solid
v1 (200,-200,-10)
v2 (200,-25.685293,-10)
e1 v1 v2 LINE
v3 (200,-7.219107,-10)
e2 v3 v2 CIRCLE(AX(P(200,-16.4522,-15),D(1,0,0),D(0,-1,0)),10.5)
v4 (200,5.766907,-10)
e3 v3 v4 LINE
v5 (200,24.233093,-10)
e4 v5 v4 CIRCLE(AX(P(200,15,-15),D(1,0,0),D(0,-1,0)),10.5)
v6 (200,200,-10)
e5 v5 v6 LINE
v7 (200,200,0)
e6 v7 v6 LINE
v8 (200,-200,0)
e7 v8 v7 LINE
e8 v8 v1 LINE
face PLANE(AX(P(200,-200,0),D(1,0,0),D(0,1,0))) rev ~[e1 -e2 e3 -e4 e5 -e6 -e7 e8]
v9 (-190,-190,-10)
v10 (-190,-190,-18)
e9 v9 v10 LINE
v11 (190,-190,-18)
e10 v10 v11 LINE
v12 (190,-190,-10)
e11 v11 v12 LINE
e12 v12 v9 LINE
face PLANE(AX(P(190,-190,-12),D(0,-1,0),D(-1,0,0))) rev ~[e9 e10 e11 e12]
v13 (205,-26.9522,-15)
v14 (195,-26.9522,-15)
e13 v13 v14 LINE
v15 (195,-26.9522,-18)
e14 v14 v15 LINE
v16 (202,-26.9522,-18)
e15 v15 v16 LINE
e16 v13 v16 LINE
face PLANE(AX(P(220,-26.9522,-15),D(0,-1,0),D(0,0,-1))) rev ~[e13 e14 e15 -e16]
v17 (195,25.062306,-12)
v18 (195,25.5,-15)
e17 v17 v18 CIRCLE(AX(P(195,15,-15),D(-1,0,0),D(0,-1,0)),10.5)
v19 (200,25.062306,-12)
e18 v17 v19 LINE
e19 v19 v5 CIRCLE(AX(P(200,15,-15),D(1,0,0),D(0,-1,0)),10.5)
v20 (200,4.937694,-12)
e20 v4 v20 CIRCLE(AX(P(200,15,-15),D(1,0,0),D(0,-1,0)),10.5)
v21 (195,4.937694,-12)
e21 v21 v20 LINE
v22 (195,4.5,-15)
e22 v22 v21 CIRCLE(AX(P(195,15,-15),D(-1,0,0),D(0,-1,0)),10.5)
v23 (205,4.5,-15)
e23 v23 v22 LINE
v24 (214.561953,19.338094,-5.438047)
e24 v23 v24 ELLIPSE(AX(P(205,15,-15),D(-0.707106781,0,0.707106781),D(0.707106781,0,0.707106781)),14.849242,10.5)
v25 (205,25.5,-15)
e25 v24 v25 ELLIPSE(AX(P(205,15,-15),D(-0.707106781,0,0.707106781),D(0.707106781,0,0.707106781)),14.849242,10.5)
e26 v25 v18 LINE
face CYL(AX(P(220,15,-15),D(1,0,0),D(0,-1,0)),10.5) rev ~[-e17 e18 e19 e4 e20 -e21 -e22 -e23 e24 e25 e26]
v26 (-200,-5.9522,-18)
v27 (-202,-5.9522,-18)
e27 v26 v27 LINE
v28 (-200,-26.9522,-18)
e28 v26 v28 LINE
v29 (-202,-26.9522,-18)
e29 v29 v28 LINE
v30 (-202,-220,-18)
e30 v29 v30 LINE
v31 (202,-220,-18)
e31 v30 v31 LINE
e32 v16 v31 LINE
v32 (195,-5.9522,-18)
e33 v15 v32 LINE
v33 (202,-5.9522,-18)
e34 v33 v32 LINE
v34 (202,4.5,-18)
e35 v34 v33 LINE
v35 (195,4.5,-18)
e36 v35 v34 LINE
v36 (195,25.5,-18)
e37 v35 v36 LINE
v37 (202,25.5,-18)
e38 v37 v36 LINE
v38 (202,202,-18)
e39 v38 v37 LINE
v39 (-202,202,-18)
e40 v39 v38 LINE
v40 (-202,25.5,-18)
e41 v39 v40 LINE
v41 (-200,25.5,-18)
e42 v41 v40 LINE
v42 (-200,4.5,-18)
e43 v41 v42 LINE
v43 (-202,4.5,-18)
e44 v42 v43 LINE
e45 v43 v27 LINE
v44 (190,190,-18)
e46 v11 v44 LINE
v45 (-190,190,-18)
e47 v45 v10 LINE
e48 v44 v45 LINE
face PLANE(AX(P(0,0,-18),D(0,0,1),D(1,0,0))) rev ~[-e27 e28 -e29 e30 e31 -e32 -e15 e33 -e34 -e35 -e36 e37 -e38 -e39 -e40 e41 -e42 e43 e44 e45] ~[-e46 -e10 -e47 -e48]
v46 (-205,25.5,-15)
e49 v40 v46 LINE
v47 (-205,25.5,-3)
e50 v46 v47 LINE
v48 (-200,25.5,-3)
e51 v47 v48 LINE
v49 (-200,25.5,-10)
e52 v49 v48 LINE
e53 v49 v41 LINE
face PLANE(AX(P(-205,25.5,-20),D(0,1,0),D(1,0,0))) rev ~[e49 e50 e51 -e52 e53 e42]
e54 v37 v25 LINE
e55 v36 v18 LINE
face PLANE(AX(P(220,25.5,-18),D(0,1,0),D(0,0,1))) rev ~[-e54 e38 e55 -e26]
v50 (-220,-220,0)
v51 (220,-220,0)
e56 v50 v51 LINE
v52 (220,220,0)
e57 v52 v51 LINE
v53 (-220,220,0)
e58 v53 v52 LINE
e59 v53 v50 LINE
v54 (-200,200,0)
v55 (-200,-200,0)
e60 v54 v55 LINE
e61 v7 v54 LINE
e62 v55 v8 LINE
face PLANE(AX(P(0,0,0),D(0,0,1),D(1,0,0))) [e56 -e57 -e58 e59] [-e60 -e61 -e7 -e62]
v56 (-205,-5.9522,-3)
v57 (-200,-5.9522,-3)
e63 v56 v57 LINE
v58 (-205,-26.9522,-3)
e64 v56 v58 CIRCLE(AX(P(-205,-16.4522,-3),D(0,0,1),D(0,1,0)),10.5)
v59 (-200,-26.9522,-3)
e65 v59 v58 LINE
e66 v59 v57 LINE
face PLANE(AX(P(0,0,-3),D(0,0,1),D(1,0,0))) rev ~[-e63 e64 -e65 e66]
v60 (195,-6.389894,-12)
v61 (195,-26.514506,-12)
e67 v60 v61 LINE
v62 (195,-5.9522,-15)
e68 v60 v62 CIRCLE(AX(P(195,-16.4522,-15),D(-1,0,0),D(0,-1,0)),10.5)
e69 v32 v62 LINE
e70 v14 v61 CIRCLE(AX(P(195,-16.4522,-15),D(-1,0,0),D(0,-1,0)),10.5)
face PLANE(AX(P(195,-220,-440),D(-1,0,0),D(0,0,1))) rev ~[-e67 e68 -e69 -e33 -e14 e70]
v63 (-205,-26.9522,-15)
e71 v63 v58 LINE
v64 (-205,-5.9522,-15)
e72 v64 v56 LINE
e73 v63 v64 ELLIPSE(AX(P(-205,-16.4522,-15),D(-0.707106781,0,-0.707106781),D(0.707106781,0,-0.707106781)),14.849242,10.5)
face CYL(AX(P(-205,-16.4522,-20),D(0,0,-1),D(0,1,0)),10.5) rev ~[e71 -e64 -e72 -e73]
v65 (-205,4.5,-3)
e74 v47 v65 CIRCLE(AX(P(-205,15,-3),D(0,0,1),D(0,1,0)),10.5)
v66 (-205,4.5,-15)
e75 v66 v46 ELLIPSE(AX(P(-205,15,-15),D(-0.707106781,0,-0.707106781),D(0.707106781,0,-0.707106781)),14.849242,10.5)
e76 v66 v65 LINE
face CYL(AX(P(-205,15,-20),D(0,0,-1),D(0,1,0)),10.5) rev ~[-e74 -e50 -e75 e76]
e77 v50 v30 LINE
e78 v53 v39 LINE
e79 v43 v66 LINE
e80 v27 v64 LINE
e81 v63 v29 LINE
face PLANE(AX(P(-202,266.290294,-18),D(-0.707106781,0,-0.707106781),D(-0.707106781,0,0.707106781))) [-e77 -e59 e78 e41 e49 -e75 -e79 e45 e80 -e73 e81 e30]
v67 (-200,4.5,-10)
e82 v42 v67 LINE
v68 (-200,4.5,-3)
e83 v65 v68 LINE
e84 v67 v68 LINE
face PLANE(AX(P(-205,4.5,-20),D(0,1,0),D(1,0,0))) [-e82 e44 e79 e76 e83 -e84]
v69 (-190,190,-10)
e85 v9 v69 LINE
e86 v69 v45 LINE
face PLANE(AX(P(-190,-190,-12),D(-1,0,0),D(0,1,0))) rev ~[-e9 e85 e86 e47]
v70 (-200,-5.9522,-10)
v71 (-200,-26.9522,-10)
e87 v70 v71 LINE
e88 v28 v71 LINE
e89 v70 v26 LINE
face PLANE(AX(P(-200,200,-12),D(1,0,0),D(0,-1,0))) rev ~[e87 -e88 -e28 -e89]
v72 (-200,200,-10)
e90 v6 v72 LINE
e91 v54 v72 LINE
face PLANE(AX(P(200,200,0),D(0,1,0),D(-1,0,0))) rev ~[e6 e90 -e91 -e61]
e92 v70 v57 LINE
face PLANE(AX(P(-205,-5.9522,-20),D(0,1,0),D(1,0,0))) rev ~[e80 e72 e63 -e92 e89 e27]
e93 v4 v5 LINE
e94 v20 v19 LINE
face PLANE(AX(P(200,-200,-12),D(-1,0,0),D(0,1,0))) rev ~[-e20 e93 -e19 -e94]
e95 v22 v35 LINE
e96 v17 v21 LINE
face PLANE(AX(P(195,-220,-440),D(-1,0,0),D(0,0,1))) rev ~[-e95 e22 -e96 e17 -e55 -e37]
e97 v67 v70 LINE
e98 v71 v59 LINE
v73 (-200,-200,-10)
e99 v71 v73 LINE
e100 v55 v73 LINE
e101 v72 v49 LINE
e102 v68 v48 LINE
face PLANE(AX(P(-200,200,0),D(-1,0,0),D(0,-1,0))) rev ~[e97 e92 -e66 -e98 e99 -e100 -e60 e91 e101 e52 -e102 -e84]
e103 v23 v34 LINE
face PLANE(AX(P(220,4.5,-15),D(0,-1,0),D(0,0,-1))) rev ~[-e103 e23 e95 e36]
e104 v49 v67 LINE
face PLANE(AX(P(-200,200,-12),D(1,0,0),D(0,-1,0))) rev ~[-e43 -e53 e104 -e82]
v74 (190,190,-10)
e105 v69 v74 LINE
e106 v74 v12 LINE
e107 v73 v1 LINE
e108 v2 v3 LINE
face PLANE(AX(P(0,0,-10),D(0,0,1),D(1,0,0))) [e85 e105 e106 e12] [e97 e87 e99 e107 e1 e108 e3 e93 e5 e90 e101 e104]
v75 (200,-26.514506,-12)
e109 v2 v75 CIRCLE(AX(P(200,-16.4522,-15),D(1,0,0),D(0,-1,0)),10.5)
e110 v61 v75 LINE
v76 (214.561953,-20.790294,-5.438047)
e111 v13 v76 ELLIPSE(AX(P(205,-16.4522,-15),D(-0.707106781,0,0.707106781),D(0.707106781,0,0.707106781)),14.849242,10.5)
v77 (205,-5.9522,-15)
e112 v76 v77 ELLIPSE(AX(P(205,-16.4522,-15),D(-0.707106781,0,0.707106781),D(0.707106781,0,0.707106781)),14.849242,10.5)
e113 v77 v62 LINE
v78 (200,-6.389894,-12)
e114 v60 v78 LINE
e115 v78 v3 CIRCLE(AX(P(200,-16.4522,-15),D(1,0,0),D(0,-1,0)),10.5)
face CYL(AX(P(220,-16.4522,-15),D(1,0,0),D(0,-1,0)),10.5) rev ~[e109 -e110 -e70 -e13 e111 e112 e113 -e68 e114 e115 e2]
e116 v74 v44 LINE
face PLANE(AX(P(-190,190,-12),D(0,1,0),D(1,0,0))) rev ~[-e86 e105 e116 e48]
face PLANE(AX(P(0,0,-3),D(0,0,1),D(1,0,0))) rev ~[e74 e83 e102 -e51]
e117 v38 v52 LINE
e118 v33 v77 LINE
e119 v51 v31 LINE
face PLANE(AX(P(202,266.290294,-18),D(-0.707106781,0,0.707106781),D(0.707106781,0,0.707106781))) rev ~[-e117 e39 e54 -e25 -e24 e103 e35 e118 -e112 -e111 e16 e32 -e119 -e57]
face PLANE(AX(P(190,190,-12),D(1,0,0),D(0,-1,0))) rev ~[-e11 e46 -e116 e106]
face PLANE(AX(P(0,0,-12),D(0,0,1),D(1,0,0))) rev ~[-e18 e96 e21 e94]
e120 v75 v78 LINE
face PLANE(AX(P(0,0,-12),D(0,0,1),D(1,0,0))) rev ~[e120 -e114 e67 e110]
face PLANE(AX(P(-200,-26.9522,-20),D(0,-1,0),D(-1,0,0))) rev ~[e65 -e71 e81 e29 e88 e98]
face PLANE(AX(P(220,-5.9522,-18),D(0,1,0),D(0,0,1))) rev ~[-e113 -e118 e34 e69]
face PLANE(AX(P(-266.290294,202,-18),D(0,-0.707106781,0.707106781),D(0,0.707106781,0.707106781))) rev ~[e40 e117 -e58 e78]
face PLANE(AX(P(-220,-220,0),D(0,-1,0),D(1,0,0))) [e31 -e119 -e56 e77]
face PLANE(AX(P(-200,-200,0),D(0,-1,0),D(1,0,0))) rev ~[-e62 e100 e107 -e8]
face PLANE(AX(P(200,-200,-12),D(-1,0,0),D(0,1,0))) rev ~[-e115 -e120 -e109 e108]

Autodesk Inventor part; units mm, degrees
ref_plane "YZ Plane" through (0, 0, 0) normal (1, 0, 0) x (0, 1, 0)
ref_plane "XZ Plane" through (0, 0, 0) normal (0, 1, 0) x (-1, 0, 0)
ref_plane "XY Plane" through (0, 0, 0) normal (0, 0, 1) x (1, 0, 0)
sketch "Skizze1" plane through (0, 0, 0) normal (0, 0, 1) x (1, 0, 0)
  line L0 (-220, -220) -> (220, -220) projected
  line L1 (220, 220) -> (220, -220) projected
  line L2 (-220, 220) -> (-220, -220) projected
  line L3 (-220, 220) -> (220, 220) projected
  line L4 (200, 200) -> (-200, 200) projected
  line L5 (-200, 200) -> (-200, -200) projected
  line L6 (-200, -200) -> (200, -200) projected
  line L7 (200, -200) -> (200, 200) projected
  line L8 (220, -220) -> (-220, -220)
  line L9 (-220, -220) -> (-220, 220)
  line L10 (-220, 220) -> (220, 220)
  line L11 (220, 220) -> (220, -220)
  line L12 (200, -200) -> (-200, -200)
  line L13 (-200, -200) -> (-200, 200)
  line L14 (-200, 200) -> (200, 200)
  line L15 (200, 200) -> (200, -200)
  point P0 (0, 0)
extrude "Extrusion1" add sketch "Skizze1" against normal blind 18
ref_plane "Arbeitsebene1" through (0, 0, -20) normal (0, 0, 1) x (1, 0, 0)
sketch "Skizze3" plane through (0, 0, -20) normal (0, 0, 1) x (1, 0, 0)
  arc A0 (-205, 25.5) -> (-205, 4.5) centre (-205, 15) ccw projected
  arc A1 (-205, 25.5) -> (-205, 4.5) centre (-205, 15) ccw projected
  arc A2 (-205, -5.9522) -> (-205, -26.9522) centre (-205, -16.4522) ccw projected
  arc A3 (-205, -5.9522) -> (-205, -26.9522) centre (-205, -16.4522) ccw projected
  arc A4 (-205, -5.9522) -> (-205, -26.9522) centre (-205, -16.4522) ccw projected
  arc A5 (-205, -5.9522) -> (-205, -26.9522) centre (-205, -16.4522) ccw projected
  line L0 (-200, -26.9522) -> (-205, -26.9522) projected
  line L1 (-205, -5.9522) -> (-200, -5.9522) projected
  line L2 (-205, 4.5) -> (-200, 4.5)
  line L3 (-200, -200) -> (-200, 200) projected
  line L4 (-205, 25.5) -> (-200, 25.5)
  line L5 (-205, -5.9522) -> (-200, -5.9522)
  line L6 (-205, -26.9522) -> (-200, -26.9522)
  arc A6 (-205, 25.5) -> (-205, 4.5) centre (-205, 15) ccw
  arc A7 (-205, -5.9522) -> (-205, -26.9522) centre (-205, -16.4522) ccw
  point P0 (0, 0)
extrude "Extrusion2" cut sketch "Skizze3" along normal blind 17
sketch "Skizze5" plane through (0, 0, -20) normal (0, 0, 1) x (1, 0, 0)
  line L0 (-200, -26.9522) -> (-200, -200) projected
  line L1 (-200, -200) -> (200, -200) projected
  line L2 (200, -200) -> (200, 200) projected
  line L3 (-200, 200) -> (200, 200) projected
  line L4 (-200, -200) -> (200, -200)
  line L5 (200, -200) -> (200, 200)
  line L6 (200, 200) -> (-200, 200)
  line L7 (-200, 200) -> (-200, -200)
  line L8 (-190, -190) -> (190, -190)
  line L9 (190, -190) -> (190, 190)
  line L10 (190, 190) -> (-190, 190)
  line L11 (-190, 190) -> (-190, -190)
  point P0 (0, 0)
  dimension "d8" = 10
  dimension "d9" = 10
  dimension "d10" = 10
  dimension "d11" = 10
extrude "Extrusion3" add sketch "Skizze5" along normal blind 8
ref_plane "Arbeitsebene3" through (220, -220, -440) normal (-1, 0, 0) x (0, 0, 1)
sketch "Skizze6" plane through (220, -220, -440) normal (-1, 0, 0) x (0, 0, 1)
  arc A0 (425, 193.0478) -> (425, 214.0478) centre (425, 203.5478) ccw projected
  arc A1 (425, 224.5) -> (425, 245.5) centre (425, 235) ccw projected
  line L0 (425, 224.5) -> (422, 224.5) projected
  line L1 (422, 214.0478) -> (425, 214.0478) projected
  line L2 (425, 193.0478) -> (422, 193.0478) projected
  line L3 (422, 245.5) -> (425, 245.5) projected
  line L4 (422, 193.0478) -> (428, 193.0478) projected
  line L5 (422, 193.0478) -> (425, 193.0478)
  line L6 (422, 214.0478) -> (425, 214.0478)
  line L7 (428, 214.0478) -> (422, 214.0478) projected
  line L8 (420, 245.5) -> (420, 224.5) projected
  line L9 (422, 224.5) -> (425, 224.5)
  line L10 (422, 245.5) -> (425, 245.5)
  line L11 (420, 193.0478) -> (420, 20) projected
  line L12 (422, 193.0478) -> (422, 214.0478)
  line L13 (422, 224.5) -> (422, 245.5)
  arc A2 (425, 193.0478) -> (425, 214.0478) centre (425, 203.5478) ccw
  arc A3 (425, 224.5) -> (425, 245.5) centre (425, 235) ccw
  point P0 (440, 220)
  point P1 (420, 20)
extrude "Extrusion4" cut sketch "Skizze6" along normal blind 25
sketch "Skizze7" plane through (0, 0, -20) normal (0, 0, -1) x (-1, 0, 0)
  line L0 (190, 190) -> (190, -190) projected
  line L1 (190, -190) -> (-190, -190) projected
  line L2 (-190, -190) -> (-190, 190) projected
  line L3 (-190, 190) -> (190, 190) projected
  line L4 (200, -200) -> (-200, -200) projected
  line L5 (200, 200) -> (200, -200) projected
  line L6 (-200, 200) -> (200, 200) projected
  line L7 (-200, -200) -> (-200, 200) projected
  line L8 (-200, 200) -> (200, 200) projected
  line L9 (-190, -190) -> (-190, 190) projected
  point P0 (0, 0)
extrude "Extrusion5" cut sketch "Skizze7" against normal blind 2
sketch "Skizze8" plane through (0, 0, -12) normal (0, 0, 1) x (1, 0, 0)
  line L0 (-200, -200) -> (200, -200) projected
  line L1 (200, -200) -> (200, 200) projected
  line L2 (200, 200) -> (-200, 200) projected
  line L3 (-200, 200) -> (-200, -200) projected
  line L4 (190, -190) -> (-190, -190) projected
  line L5 (-190, -190) -> (-190, 190) projected
  line L6 (-190, 190) -> (190, 190) projected
  line L7 (190, 190) -> (190, -190) projected
  line L8 (-200, -200) -> (200, -200) projected
  line L9 (200, -200) -> (200, 200) projected
  line L10 (200, 200) -> (-200, 200) projected
  line L11 (-200, 200) -> (-200, -200) projected
  point P0 (0, 0)
extrude "Extrusion6" add sketch "Skizze8" along normal blind 2
chamfer "Fase2" distance 18 angle 45 5 edges at (220, 122.75, -18) (220, -123.4761, -18) (220, -0.7261, -18) (0, 220, -18) (-220, 0, -18)
properties part number "PV_Ramen_CPY_3_CPY2"
